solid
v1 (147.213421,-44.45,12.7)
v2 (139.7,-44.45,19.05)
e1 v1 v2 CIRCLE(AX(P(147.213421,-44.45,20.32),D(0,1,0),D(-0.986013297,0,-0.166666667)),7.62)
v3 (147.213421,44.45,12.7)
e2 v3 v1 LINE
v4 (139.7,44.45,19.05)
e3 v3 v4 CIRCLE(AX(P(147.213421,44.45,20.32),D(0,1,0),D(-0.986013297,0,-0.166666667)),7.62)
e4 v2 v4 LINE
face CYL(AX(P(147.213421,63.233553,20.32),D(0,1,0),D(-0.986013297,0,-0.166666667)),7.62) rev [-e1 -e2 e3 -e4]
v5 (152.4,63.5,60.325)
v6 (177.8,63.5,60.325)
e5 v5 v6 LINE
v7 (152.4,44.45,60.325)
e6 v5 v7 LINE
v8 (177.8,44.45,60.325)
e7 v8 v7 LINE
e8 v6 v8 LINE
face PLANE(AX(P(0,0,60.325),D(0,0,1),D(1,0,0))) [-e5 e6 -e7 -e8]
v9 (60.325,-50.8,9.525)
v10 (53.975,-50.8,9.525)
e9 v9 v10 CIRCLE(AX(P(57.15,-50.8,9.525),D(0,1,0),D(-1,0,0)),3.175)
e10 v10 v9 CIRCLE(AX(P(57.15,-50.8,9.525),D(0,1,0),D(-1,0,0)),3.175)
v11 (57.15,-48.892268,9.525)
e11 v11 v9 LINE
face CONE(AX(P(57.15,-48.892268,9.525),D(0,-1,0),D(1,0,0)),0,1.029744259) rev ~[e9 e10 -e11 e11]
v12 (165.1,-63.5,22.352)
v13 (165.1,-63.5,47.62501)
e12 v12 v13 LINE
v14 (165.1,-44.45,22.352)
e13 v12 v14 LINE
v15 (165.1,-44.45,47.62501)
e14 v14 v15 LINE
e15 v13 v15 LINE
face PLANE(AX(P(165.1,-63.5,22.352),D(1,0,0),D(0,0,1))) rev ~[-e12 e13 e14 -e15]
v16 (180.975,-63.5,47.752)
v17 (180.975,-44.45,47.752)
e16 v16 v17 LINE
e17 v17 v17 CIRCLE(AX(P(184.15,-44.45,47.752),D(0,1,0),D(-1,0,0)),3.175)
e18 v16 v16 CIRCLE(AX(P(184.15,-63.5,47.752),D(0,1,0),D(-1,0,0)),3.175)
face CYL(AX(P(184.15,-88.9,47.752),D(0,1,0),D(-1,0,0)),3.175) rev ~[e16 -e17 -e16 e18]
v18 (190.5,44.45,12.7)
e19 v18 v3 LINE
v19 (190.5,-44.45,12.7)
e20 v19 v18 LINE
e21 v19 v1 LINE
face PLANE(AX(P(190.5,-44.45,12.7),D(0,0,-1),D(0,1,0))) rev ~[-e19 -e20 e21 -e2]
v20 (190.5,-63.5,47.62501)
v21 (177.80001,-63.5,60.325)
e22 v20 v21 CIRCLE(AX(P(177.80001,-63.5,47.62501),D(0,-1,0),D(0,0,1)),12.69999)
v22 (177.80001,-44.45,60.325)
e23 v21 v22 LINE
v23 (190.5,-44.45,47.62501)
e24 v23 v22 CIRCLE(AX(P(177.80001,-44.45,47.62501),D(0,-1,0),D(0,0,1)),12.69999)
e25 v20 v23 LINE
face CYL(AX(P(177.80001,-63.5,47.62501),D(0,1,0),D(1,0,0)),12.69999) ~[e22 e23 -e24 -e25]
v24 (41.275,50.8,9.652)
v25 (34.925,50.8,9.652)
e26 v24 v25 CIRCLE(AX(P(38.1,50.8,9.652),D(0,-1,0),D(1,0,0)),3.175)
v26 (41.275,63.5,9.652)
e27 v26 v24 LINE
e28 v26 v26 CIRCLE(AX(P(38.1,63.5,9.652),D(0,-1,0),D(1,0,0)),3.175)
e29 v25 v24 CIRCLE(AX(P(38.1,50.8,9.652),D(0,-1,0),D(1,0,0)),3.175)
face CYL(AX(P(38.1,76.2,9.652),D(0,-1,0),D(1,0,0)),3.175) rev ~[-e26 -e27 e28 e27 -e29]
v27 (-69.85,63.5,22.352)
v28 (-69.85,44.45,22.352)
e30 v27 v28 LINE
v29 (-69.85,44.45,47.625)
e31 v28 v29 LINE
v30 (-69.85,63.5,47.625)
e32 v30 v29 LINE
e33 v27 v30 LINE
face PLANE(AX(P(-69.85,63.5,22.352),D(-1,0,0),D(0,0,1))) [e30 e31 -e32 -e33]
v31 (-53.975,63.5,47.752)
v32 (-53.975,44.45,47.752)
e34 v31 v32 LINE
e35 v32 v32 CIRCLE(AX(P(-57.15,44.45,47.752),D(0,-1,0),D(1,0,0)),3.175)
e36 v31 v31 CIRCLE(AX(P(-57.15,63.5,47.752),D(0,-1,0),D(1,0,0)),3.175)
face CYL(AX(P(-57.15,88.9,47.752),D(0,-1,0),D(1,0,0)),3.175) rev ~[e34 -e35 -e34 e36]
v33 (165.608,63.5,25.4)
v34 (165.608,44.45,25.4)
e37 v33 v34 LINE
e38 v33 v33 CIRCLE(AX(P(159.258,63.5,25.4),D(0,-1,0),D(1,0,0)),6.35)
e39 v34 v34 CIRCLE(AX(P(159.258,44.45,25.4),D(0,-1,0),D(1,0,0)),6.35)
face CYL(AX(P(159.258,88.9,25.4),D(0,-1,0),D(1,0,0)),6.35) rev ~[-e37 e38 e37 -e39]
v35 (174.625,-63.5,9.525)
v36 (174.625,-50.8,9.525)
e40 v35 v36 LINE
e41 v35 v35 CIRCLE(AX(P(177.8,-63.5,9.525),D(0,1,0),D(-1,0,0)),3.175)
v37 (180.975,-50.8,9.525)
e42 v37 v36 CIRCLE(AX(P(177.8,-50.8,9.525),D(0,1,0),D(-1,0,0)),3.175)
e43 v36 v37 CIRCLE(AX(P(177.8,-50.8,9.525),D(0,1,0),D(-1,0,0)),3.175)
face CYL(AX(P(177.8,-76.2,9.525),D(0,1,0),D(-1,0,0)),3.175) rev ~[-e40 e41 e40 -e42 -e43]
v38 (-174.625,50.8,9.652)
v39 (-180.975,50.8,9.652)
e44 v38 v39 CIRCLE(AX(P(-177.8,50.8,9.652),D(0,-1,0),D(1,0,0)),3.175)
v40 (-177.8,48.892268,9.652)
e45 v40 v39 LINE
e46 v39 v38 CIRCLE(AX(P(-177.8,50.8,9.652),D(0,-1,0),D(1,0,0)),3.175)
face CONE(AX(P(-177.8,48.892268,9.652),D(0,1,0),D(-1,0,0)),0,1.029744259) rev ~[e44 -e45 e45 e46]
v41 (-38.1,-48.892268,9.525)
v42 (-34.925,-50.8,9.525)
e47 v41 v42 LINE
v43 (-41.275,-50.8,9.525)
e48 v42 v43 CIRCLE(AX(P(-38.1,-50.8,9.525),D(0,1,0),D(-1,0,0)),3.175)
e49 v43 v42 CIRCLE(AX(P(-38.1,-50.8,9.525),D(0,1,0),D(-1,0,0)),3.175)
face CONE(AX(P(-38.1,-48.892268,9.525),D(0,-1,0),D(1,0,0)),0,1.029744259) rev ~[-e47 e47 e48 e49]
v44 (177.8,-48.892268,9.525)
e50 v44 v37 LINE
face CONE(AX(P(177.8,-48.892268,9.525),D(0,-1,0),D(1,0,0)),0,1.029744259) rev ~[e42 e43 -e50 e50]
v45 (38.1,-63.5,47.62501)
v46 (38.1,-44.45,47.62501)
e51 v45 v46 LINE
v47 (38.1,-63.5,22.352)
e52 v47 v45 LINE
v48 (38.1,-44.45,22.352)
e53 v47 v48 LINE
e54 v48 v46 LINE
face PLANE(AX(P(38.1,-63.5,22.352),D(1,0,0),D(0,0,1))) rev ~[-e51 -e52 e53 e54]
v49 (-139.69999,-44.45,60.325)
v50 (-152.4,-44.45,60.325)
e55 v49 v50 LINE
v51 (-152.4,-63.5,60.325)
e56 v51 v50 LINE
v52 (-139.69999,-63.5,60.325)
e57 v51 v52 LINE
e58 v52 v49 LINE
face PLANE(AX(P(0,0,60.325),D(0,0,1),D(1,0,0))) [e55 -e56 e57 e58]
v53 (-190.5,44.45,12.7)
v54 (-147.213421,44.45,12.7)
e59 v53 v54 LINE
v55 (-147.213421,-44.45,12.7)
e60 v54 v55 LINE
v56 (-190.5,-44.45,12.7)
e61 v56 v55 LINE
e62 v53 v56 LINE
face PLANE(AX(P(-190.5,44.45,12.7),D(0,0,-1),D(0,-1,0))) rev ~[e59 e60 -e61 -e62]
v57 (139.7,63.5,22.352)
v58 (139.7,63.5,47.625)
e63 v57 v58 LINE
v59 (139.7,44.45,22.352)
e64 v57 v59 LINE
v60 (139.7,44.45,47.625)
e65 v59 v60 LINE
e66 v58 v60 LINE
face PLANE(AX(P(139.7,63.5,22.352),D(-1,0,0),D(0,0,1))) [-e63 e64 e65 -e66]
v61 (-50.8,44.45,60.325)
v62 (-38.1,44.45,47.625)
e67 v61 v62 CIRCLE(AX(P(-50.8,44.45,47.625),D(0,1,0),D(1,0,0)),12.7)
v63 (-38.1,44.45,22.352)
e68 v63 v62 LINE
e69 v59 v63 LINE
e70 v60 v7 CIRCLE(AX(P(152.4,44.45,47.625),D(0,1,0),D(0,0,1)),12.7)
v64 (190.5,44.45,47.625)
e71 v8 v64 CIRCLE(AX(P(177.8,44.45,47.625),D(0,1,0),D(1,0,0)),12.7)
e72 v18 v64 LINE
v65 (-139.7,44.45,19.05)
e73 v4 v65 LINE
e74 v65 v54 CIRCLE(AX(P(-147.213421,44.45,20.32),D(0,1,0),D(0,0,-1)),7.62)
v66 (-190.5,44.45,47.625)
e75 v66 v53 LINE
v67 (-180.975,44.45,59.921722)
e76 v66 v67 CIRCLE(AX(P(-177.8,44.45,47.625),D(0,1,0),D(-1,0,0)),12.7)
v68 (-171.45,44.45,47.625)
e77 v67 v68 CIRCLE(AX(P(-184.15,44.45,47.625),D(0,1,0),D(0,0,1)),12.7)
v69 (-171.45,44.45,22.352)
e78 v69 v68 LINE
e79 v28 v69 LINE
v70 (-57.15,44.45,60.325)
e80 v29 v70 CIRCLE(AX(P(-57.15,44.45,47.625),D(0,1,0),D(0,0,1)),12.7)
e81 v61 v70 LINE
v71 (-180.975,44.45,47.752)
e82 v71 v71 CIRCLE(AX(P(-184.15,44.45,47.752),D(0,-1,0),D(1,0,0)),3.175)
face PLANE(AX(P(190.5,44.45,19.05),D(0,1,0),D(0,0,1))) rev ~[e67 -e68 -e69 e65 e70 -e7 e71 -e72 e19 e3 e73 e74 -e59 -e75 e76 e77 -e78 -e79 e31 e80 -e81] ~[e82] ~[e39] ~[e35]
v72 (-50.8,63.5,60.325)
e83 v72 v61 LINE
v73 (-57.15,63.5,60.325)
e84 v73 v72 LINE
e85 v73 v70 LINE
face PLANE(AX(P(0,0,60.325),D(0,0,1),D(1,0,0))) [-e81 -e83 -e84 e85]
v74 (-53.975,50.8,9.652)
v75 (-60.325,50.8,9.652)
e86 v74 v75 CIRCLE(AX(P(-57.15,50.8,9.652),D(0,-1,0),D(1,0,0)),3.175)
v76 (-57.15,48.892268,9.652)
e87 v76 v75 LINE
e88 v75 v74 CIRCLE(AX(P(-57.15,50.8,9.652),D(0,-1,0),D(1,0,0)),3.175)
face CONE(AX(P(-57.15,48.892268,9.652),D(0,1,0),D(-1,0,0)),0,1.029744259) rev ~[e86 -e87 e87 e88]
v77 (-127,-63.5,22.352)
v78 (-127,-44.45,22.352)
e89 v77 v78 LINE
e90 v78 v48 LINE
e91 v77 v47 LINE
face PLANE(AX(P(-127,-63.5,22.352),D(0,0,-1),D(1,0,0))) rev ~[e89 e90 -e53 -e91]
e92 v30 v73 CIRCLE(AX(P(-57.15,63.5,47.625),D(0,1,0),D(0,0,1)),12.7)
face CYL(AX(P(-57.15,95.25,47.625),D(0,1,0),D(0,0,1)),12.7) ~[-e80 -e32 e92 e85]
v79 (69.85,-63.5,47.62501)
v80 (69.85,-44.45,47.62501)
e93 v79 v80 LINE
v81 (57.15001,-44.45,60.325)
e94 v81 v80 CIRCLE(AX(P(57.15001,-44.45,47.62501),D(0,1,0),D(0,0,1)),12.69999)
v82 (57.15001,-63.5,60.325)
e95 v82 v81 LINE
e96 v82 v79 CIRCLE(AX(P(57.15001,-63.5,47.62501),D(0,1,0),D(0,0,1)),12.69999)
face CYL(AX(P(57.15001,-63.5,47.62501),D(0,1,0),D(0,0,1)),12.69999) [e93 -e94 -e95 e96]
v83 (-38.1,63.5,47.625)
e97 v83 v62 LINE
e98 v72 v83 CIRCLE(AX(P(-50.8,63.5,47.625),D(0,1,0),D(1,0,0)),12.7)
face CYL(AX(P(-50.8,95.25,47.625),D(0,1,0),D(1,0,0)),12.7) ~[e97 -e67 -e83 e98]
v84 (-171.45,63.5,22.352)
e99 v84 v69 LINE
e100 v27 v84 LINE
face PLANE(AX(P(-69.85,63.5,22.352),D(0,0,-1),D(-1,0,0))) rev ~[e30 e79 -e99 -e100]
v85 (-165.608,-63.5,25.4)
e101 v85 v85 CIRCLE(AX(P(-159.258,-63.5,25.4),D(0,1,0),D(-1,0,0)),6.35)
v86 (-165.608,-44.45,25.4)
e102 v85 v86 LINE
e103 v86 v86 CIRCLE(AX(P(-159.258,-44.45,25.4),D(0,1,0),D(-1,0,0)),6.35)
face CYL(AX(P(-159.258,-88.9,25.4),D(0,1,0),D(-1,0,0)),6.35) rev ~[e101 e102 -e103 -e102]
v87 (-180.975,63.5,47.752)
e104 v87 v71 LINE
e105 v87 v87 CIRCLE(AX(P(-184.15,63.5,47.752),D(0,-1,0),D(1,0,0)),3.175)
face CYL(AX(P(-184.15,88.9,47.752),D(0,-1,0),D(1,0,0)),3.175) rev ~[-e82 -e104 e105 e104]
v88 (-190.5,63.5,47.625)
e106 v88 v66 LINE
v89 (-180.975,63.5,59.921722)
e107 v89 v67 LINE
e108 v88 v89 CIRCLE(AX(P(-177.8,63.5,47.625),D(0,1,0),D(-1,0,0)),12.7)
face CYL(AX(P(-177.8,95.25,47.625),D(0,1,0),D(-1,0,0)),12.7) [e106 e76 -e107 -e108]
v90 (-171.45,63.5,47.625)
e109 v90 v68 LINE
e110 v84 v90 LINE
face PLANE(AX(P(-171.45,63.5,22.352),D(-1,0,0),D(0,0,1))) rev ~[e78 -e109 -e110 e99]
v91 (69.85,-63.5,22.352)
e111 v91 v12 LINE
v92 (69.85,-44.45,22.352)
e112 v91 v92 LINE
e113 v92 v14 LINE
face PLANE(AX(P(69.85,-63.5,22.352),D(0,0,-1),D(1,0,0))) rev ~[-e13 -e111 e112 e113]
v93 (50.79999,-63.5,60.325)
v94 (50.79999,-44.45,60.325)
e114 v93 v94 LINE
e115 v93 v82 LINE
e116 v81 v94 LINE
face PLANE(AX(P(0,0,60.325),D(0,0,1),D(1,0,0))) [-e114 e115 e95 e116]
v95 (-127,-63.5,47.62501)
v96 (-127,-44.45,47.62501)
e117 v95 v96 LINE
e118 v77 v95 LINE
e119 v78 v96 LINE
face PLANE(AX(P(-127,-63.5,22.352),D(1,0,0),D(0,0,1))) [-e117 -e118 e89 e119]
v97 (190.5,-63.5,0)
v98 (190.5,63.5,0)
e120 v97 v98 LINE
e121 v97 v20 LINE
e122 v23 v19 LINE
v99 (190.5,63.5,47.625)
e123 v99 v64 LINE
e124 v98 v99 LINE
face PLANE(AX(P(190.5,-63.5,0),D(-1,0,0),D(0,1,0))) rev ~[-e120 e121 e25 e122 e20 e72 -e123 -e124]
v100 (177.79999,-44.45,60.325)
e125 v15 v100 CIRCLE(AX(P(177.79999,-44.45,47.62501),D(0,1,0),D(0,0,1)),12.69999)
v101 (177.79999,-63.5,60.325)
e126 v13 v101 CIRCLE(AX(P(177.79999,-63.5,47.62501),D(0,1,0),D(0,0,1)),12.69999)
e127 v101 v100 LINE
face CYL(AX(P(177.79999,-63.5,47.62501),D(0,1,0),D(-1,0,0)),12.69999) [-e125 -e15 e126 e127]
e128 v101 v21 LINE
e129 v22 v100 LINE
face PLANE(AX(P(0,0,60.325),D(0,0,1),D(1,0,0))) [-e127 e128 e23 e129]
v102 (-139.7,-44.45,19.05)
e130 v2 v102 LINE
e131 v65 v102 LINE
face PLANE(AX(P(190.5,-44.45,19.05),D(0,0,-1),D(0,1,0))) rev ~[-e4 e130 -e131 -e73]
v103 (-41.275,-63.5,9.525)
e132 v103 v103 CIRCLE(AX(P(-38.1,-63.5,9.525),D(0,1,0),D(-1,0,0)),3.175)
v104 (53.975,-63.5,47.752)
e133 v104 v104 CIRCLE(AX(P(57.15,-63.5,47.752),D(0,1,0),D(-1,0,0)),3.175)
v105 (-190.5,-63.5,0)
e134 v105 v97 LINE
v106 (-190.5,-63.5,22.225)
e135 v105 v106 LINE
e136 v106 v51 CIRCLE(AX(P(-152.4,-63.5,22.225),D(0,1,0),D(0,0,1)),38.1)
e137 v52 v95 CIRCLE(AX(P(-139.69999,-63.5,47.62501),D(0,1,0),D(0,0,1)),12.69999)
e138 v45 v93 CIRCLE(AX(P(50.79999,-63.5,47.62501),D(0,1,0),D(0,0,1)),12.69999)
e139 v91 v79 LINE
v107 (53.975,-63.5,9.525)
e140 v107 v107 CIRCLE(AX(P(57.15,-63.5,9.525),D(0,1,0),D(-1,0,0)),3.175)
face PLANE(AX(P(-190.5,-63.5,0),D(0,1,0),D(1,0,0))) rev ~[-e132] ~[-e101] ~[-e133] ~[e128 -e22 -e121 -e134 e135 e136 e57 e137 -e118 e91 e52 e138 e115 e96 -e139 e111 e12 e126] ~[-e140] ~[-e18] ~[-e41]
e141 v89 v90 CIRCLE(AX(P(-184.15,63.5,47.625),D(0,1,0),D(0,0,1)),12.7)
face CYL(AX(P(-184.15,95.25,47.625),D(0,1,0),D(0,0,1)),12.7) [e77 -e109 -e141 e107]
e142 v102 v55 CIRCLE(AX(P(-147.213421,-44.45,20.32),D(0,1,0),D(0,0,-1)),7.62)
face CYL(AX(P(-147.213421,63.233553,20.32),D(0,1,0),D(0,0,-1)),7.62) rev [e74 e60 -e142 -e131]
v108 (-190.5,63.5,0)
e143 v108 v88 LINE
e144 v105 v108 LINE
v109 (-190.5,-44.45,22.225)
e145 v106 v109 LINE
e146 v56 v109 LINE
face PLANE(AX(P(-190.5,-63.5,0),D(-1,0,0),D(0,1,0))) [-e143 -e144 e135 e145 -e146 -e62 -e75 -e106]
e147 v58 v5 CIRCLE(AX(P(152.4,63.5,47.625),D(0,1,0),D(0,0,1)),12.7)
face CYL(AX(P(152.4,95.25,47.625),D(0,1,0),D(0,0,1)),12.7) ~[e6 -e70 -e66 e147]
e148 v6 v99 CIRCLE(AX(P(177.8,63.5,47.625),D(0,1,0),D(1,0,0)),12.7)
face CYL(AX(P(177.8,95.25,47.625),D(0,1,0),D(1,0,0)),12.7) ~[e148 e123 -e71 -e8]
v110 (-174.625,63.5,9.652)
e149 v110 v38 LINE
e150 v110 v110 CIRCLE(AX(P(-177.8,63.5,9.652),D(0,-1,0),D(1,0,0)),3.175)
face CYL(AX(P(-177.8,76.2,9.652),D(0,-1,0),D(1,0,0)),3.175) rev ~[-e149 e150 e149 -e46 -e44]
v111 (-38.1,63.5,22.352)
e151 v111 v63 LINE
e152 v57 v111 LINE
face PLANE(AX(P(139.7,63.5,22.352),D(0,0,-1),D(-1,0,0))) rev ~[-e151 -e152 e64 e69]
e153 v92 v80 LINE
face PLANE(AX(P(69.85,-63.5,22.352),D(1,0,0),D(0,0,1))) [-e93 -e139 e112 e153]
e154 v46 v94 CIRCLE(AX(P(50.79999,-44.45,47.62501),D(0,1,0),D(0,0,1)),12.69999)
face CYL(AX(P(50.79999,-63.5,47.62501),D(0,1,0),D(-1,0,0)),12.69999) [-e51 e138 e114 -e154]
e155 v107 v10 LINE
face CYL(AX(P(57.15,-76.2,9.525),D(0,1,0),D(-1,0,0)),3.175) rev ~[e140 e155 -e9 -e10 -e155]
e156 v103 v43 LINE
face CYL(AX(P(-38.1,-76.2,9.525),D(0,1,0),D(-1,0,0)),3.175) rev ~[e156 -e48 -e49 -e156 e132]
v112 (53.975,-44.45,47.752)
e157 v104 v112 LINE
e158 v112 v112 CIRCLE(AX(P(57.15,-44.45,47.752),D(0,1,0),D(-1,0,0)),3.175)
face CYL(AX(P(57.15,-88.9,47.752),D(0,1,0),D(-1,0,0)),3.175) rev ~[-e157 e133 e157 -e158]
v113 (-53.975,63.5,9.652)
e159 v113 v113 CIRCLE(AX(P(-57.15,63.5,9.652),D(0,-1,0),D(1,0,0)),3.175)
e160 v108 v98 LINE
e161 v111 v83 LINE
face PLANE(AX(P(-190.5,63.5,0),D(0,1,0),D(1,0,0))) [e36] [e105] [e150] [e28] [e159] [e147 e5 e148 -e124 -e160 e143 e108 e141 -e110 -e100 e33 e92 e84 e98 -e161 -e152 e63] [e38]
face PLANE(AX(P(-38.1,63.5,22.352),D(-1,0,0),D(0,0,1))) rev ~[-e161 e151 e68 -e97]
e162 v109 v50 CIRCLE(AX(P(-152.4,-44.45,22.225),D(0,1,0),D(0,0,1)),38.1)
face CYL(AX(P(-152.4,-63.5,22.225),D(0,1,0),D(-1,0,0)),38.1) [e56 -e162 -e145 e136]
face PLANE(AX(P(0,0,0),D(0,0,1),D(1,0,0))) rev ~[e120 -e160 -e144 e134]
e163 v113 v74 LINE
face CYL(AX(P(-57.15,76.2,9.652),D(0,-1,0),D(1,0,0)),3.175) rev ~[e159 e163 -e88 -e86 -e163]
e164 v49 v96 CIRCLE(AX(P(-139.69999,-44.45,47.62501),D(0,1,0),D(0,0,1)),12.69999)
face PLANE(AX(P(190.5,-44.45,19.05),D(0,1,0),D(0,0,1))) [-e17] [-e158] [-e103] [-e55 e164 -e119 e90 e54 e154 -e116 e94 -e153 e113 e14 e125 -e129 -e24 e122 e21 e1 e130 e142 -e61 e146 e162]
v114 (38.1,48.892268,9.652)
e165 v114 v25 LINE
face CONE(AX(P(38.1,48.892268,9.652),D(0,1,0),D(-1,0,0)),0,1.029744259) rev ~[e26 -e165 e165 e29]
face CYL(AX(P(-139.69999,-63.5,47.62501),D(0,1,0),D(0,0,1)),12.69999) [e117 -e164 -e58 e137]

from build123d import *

# Parameters (mm, degrees)
F0_W         = 381
F0_H         = 127
F1_DEPTH     = 60.325
F2_W         = 88.9
F2_H         = 41.275
F3_DEPTH     = 381
F4_W         = 88.9
F4_H         = 6.35
F5_DEPTH     = 50.8
F6_T1_DEPTH  = 126.4671066227
F7_W         = 88.9
F7_H         = 6.35
F8_DEPTH     = 50.8
F9_T1_DEPTH  = 126.4671066227
F10_W        = 165.1
F10_H        = 37.973
F10_W_2      = 95.25
F11_DEPTH    = 19.05
F12_W        = 177.8
F12_H        = 37.973
F12_W_2      = 101.6
F13_DEPTH    = 19.05
F14_R        = 38.1
F15_R        = 12.69999
F16_T1_DEPTH = 82.55
F18_D        = 6.35
F18_DEPTH    = 12.7
F18_TIP      = 1.9077324654
F19_D        = 6.35
F19_DEPTH    = 25.4
F19_TIP      = 1.9077324654
F20_D        = 12.7
F20_DEPTH    = 25.4
F20_TIP      = 3.8154649308
F22_D        = 12.7
F22_DEPTH    = 25.4
F22_TIP      = 3.8154649308
F23_D        = 6.35
F23_DEPTH    = 12.7
F23_TIP      = 1.9077324654
F24_D        = 6.35
F24_DEPTH    = 25.4
F24_TIP      = 1.9077324654


# Not quite as in the source:
# - a fillet or chamfer that OpenCascade refuses, or shapes differently, is made with other operations: its cross-section is extruded or revolved along the edge and cut away or added
# - a fillet or chamfer is up to 0.001 mm smaller than in the source, because OpenCascade refuses the exact size


with BuildPart() as f1:
    # F0 (on Top) → F1 (new body)
    with BuildSketch(Plane.XY):
        Rectangle(F0_W, F0_H)
    extrude(amount=F1_DEPTH)

    # F2 (on face) → F3 (cut, through all)
    with BuildSketch(Plane.YZ.offset(190.5)):
        with Locations((0, 39.6875)):
            Rectangle(F2_W, F2_H)
    extrude(amount=-F3_DEPTH, mode=Mode.SUBTRACT)

    # F4 (on face) → F5 (cut)
    with BuildSketch(Plane.YZ.offset(190.5)):
        with Locations((0, 15.875)):
            Rectangle(F4_W, F4_H)
    extrude(amount=-F5_DEPTH, mode=Mode.SUBTRACT)

    # F6: fillet of radius 7.62 on 1 edges, made by hand

    # F6_s2 → F6_t1 (join)
    with BuildSketch(Plane.XZ.offset(-63.2335533113)):
        with BuildLine():
            ThreePointArc((139.7, 19.05), (142.2947324749, 14.5001288674), (147.2134213245, 12.7))
            Line((147.2134213245, 12.7), (139.7, 12.7))
            Line((139.7, 12.7), (139.7, 19.05))
        make_face()
    extrude(amount=F6_T1_DEPTH)

    # F7 (on face) → F8 (cut)
    with BuildSketch(Plane(origin=(-190.5, 0, 0), x_dir=(0, -1, 0), z_dir=(-1, 0, 0))):
        with Locations((0, 15.875)):
            Rectangle(F7_W, F7_H)
    extrude(amount=-F8_DEPTH, mode=Mode.SUBTRACT)

    # F9: fillet of radius 7.62 on 1 edges, made by hand

    # F9_s2 → F9_t1 (join)
    with BuildSketch(Plane.XZ.offset(-63.2335533113)):
        with BuildLine():
            ThreePointArc((-147.2134213245, 12.7), (-142.2947324749, 14.5001288674), (-139.7, 19.05))
            Line((-139.7, 19.05), (-139.7, 12.7))
            Line((-139.7, 12.7), (-147.2134213245, 12.7))
        make_face()
    extrude(amount=F9_T1_DEPTH)

    # F10 (on face) → F11 (cut, through all)
    with BuildSketch(Plane.XZ.offset(63.5)):
        with Locations((-44.45, 41.3385)):
            Rectangle(F10_W, F10_H)
        with Locations((117.475, 41.3385)):
            Rectangle(F10_W_2, F10_H)
    extrude(amount=-F11_DEPTH, mode=Mode.SUBTRACT)

    # F12 (on face) → F13 (cut, through all)
    with BuildSketch(Plane(origin=(0, 63.5, 0), x_dir=(-1, 0, 0), z_dir=(0, 1, 0))):
        with Locations((-50.8, 41.3385)):
            Rectangle(F12_W, F12_H)
        with Locations((120.65, 41.3385)):
            Rectangle(F12_W_2, F12_H)
    extrude(amount=-F13_DEPTH, mode=Mode.SUBTRACT)

    # F14
    f14_edges = [f1.edges().sort_by_distance(p)[0] for p in [
        (-190.5, -53.975, 60.325),
    ]]
    fillet(f14_edges, radius=F14_R)

    # F15 (radius 12.7 in the source; OpenCascade refuses exactly that, so slightly less here)
    f15_edges = [f1.edges().sort_by_distance(p)[0] for p in [
        (-127, -53.975, 60.325),
        (38.1, -53.975, 60.325),
        (69.85, -53.975, 60.325),
        (165.1, -53.975, 60.325),
        (190.5, -53.975, 60.325),
    ]]
    fillet(f15_edges, radius=F15_R)

    # F16: fillet of radius 12.7 on 6 edges, made by hand

    # F16_s2 → F16_t1 (cut)
    with BuildSketch(Plane.XZ.offset(-95.25)):
        with BuildLine():
            ThreePointArc((-184.15, 60.325), (-175.1697438789, 56.6052561211), (-171.45, 47.625))
            Line((-171.45, 47.625), (-171.45, 60.325))
            Line((-171.45, 60.325), (-184.15, 60.325))
        make_face()
        with BuildLine():
            ThreePointArc((-190.5, 47.625), (-186.7802561211, 56.6052561211), (-177.8, 60.325))
            Line((-177.8, 60.325), (-190.5, 60.325))
            Line((-190.5, 60.325), (-190.5, 47.625))
        make_face()
        with BuildLine():
            ThreePointArc((-57.15, 60.325), (-66.1302561211, 56.6052561211), (-69.85, 47.625))
            Line((-69.85, 47.625), (-69.85, 60.325))
            Line((-69.85, 60.325), (-57.15, 60.325))
        make_face()
        with BuildLine():
            ThreePointArc((-38.1, 47.625), (-41.8197438789, 56.6052561211), (-50.8, 60.325))
            Line((-50.8, 60.325), (-38.1, 60.325))
            Line((-38.1, 60.325), (-38.1, 47.625))
        make_face()
        with BuildLine():
            ThreePointArc((152.4, 60.325), (143.4197438789, 56.6052561211), (139.7, 47.625))
            Line((139.7, 47.625), (139.7, 60.325))
            Line((139.7, 60.325), (152.4, 60.325))
        make_face()
        with BuildLine():
            ThreePointArc((190.5, 47.625), (186.7802561211, 56.6052561211), (177.8, 60.325))
            Line((177.8, 60.325), (190.5, 60.325))
            Line((190.5, 60.325), (190.5, 47.625))
        make_face()
    extrude(amount=F16_T1_DEPTH, mode=Mode.SUBTRACT)

    # F18
    with Locations(Plane.XZ.offset(63.5)):
        with Locations((-38.1, 9.525), (57.15, 9.525), (177.8, 9.525)):
            Hole(F18_D / 2, depth=F18_DEPTH)
            with Locations((0, 0, -(F18_DEPTH + F18_TIP / 2))):  # 118° drill point
                Cone(0, F18_D / 2, F18_TIP, mode=Mode.SUBTRACT)

    # F19
    with Locations(Plane.XZ.offset(63.5)):
        with Locations((57.15, 47.752), (184.15, 47.752)):
            Hole(F19_D / 2, depth=F19_DEPTH)
            with Locations((0, 0, -(F19_DEPTH + F19_TIP / 2))):  # 118° drill point
                Cone(0, F19_D / 2, F19_TIP, mode=Mode.SUBTRACT)

    # F20
    with Locations(Plane.XZ.offset(63.5)):
        with Locations((-159.258, 25.4)):
            Hole(F20_D / 2, depth=F20_DEPTH)
            with Locations((0, 0, -(F20_DEPTH + F20_TIP / 2))):  # 118° drill point
                Cone(0, F20_D / 2, F20_TIP, mode=Mode.SUBTRACT)

    # F22
    with Locations(Plane(origin=(0, 63.5, 0), x_dir=(-1, 0, 0), z_dir=(0, 1, 0))):
        with Locations((-159.258, 25.4)):
            Hole(F22_D / 2, depth=F22_DEPTH)
            with Locations((0, 0, -(F22_DEPTH + F22_TIP / 2))):  # 118° drill point
                Cone(0, F22_D / 2, F22_TIP, mode=Mode.SUBTRACT)

    # F23
    with Locations(Plane(origin=(0, 63.5, 0), x_dir=(-1, 0, 0), z_dir=(0, 1, 0))):
        with Locations((-38.1, 9.652), (57.15, 9.652), (177.8, 9.652)):
            Hole(F23_D / 2, depth=F23_DEPTH)
            with Locations((0, 0, -(F23_DEPTH + F23_TIP / 2))):  # 118° drill point
                Cone(0, F23_D / 2, F23_TIP, mode=Mode.SUBTRACT)

    # F24
    with Locations(Plane(origin=(0, 63.5, 0), x_dir=(-1, 0, 0), z_dir=(0, 1, 0))):
        with Locations((57.15, 47.752), (184.15, 47.752)):
            Hole(F24_D / 2, depth=F24_DEPTH)
            with Locations((0, 0, -(F24_DEPTH + F24_TIP / 2))):  # 118° drill point
                Cone(0, F24_D / 2, F24_TIP, mode=Mode.SUBTRACT)


solid = f1.part
